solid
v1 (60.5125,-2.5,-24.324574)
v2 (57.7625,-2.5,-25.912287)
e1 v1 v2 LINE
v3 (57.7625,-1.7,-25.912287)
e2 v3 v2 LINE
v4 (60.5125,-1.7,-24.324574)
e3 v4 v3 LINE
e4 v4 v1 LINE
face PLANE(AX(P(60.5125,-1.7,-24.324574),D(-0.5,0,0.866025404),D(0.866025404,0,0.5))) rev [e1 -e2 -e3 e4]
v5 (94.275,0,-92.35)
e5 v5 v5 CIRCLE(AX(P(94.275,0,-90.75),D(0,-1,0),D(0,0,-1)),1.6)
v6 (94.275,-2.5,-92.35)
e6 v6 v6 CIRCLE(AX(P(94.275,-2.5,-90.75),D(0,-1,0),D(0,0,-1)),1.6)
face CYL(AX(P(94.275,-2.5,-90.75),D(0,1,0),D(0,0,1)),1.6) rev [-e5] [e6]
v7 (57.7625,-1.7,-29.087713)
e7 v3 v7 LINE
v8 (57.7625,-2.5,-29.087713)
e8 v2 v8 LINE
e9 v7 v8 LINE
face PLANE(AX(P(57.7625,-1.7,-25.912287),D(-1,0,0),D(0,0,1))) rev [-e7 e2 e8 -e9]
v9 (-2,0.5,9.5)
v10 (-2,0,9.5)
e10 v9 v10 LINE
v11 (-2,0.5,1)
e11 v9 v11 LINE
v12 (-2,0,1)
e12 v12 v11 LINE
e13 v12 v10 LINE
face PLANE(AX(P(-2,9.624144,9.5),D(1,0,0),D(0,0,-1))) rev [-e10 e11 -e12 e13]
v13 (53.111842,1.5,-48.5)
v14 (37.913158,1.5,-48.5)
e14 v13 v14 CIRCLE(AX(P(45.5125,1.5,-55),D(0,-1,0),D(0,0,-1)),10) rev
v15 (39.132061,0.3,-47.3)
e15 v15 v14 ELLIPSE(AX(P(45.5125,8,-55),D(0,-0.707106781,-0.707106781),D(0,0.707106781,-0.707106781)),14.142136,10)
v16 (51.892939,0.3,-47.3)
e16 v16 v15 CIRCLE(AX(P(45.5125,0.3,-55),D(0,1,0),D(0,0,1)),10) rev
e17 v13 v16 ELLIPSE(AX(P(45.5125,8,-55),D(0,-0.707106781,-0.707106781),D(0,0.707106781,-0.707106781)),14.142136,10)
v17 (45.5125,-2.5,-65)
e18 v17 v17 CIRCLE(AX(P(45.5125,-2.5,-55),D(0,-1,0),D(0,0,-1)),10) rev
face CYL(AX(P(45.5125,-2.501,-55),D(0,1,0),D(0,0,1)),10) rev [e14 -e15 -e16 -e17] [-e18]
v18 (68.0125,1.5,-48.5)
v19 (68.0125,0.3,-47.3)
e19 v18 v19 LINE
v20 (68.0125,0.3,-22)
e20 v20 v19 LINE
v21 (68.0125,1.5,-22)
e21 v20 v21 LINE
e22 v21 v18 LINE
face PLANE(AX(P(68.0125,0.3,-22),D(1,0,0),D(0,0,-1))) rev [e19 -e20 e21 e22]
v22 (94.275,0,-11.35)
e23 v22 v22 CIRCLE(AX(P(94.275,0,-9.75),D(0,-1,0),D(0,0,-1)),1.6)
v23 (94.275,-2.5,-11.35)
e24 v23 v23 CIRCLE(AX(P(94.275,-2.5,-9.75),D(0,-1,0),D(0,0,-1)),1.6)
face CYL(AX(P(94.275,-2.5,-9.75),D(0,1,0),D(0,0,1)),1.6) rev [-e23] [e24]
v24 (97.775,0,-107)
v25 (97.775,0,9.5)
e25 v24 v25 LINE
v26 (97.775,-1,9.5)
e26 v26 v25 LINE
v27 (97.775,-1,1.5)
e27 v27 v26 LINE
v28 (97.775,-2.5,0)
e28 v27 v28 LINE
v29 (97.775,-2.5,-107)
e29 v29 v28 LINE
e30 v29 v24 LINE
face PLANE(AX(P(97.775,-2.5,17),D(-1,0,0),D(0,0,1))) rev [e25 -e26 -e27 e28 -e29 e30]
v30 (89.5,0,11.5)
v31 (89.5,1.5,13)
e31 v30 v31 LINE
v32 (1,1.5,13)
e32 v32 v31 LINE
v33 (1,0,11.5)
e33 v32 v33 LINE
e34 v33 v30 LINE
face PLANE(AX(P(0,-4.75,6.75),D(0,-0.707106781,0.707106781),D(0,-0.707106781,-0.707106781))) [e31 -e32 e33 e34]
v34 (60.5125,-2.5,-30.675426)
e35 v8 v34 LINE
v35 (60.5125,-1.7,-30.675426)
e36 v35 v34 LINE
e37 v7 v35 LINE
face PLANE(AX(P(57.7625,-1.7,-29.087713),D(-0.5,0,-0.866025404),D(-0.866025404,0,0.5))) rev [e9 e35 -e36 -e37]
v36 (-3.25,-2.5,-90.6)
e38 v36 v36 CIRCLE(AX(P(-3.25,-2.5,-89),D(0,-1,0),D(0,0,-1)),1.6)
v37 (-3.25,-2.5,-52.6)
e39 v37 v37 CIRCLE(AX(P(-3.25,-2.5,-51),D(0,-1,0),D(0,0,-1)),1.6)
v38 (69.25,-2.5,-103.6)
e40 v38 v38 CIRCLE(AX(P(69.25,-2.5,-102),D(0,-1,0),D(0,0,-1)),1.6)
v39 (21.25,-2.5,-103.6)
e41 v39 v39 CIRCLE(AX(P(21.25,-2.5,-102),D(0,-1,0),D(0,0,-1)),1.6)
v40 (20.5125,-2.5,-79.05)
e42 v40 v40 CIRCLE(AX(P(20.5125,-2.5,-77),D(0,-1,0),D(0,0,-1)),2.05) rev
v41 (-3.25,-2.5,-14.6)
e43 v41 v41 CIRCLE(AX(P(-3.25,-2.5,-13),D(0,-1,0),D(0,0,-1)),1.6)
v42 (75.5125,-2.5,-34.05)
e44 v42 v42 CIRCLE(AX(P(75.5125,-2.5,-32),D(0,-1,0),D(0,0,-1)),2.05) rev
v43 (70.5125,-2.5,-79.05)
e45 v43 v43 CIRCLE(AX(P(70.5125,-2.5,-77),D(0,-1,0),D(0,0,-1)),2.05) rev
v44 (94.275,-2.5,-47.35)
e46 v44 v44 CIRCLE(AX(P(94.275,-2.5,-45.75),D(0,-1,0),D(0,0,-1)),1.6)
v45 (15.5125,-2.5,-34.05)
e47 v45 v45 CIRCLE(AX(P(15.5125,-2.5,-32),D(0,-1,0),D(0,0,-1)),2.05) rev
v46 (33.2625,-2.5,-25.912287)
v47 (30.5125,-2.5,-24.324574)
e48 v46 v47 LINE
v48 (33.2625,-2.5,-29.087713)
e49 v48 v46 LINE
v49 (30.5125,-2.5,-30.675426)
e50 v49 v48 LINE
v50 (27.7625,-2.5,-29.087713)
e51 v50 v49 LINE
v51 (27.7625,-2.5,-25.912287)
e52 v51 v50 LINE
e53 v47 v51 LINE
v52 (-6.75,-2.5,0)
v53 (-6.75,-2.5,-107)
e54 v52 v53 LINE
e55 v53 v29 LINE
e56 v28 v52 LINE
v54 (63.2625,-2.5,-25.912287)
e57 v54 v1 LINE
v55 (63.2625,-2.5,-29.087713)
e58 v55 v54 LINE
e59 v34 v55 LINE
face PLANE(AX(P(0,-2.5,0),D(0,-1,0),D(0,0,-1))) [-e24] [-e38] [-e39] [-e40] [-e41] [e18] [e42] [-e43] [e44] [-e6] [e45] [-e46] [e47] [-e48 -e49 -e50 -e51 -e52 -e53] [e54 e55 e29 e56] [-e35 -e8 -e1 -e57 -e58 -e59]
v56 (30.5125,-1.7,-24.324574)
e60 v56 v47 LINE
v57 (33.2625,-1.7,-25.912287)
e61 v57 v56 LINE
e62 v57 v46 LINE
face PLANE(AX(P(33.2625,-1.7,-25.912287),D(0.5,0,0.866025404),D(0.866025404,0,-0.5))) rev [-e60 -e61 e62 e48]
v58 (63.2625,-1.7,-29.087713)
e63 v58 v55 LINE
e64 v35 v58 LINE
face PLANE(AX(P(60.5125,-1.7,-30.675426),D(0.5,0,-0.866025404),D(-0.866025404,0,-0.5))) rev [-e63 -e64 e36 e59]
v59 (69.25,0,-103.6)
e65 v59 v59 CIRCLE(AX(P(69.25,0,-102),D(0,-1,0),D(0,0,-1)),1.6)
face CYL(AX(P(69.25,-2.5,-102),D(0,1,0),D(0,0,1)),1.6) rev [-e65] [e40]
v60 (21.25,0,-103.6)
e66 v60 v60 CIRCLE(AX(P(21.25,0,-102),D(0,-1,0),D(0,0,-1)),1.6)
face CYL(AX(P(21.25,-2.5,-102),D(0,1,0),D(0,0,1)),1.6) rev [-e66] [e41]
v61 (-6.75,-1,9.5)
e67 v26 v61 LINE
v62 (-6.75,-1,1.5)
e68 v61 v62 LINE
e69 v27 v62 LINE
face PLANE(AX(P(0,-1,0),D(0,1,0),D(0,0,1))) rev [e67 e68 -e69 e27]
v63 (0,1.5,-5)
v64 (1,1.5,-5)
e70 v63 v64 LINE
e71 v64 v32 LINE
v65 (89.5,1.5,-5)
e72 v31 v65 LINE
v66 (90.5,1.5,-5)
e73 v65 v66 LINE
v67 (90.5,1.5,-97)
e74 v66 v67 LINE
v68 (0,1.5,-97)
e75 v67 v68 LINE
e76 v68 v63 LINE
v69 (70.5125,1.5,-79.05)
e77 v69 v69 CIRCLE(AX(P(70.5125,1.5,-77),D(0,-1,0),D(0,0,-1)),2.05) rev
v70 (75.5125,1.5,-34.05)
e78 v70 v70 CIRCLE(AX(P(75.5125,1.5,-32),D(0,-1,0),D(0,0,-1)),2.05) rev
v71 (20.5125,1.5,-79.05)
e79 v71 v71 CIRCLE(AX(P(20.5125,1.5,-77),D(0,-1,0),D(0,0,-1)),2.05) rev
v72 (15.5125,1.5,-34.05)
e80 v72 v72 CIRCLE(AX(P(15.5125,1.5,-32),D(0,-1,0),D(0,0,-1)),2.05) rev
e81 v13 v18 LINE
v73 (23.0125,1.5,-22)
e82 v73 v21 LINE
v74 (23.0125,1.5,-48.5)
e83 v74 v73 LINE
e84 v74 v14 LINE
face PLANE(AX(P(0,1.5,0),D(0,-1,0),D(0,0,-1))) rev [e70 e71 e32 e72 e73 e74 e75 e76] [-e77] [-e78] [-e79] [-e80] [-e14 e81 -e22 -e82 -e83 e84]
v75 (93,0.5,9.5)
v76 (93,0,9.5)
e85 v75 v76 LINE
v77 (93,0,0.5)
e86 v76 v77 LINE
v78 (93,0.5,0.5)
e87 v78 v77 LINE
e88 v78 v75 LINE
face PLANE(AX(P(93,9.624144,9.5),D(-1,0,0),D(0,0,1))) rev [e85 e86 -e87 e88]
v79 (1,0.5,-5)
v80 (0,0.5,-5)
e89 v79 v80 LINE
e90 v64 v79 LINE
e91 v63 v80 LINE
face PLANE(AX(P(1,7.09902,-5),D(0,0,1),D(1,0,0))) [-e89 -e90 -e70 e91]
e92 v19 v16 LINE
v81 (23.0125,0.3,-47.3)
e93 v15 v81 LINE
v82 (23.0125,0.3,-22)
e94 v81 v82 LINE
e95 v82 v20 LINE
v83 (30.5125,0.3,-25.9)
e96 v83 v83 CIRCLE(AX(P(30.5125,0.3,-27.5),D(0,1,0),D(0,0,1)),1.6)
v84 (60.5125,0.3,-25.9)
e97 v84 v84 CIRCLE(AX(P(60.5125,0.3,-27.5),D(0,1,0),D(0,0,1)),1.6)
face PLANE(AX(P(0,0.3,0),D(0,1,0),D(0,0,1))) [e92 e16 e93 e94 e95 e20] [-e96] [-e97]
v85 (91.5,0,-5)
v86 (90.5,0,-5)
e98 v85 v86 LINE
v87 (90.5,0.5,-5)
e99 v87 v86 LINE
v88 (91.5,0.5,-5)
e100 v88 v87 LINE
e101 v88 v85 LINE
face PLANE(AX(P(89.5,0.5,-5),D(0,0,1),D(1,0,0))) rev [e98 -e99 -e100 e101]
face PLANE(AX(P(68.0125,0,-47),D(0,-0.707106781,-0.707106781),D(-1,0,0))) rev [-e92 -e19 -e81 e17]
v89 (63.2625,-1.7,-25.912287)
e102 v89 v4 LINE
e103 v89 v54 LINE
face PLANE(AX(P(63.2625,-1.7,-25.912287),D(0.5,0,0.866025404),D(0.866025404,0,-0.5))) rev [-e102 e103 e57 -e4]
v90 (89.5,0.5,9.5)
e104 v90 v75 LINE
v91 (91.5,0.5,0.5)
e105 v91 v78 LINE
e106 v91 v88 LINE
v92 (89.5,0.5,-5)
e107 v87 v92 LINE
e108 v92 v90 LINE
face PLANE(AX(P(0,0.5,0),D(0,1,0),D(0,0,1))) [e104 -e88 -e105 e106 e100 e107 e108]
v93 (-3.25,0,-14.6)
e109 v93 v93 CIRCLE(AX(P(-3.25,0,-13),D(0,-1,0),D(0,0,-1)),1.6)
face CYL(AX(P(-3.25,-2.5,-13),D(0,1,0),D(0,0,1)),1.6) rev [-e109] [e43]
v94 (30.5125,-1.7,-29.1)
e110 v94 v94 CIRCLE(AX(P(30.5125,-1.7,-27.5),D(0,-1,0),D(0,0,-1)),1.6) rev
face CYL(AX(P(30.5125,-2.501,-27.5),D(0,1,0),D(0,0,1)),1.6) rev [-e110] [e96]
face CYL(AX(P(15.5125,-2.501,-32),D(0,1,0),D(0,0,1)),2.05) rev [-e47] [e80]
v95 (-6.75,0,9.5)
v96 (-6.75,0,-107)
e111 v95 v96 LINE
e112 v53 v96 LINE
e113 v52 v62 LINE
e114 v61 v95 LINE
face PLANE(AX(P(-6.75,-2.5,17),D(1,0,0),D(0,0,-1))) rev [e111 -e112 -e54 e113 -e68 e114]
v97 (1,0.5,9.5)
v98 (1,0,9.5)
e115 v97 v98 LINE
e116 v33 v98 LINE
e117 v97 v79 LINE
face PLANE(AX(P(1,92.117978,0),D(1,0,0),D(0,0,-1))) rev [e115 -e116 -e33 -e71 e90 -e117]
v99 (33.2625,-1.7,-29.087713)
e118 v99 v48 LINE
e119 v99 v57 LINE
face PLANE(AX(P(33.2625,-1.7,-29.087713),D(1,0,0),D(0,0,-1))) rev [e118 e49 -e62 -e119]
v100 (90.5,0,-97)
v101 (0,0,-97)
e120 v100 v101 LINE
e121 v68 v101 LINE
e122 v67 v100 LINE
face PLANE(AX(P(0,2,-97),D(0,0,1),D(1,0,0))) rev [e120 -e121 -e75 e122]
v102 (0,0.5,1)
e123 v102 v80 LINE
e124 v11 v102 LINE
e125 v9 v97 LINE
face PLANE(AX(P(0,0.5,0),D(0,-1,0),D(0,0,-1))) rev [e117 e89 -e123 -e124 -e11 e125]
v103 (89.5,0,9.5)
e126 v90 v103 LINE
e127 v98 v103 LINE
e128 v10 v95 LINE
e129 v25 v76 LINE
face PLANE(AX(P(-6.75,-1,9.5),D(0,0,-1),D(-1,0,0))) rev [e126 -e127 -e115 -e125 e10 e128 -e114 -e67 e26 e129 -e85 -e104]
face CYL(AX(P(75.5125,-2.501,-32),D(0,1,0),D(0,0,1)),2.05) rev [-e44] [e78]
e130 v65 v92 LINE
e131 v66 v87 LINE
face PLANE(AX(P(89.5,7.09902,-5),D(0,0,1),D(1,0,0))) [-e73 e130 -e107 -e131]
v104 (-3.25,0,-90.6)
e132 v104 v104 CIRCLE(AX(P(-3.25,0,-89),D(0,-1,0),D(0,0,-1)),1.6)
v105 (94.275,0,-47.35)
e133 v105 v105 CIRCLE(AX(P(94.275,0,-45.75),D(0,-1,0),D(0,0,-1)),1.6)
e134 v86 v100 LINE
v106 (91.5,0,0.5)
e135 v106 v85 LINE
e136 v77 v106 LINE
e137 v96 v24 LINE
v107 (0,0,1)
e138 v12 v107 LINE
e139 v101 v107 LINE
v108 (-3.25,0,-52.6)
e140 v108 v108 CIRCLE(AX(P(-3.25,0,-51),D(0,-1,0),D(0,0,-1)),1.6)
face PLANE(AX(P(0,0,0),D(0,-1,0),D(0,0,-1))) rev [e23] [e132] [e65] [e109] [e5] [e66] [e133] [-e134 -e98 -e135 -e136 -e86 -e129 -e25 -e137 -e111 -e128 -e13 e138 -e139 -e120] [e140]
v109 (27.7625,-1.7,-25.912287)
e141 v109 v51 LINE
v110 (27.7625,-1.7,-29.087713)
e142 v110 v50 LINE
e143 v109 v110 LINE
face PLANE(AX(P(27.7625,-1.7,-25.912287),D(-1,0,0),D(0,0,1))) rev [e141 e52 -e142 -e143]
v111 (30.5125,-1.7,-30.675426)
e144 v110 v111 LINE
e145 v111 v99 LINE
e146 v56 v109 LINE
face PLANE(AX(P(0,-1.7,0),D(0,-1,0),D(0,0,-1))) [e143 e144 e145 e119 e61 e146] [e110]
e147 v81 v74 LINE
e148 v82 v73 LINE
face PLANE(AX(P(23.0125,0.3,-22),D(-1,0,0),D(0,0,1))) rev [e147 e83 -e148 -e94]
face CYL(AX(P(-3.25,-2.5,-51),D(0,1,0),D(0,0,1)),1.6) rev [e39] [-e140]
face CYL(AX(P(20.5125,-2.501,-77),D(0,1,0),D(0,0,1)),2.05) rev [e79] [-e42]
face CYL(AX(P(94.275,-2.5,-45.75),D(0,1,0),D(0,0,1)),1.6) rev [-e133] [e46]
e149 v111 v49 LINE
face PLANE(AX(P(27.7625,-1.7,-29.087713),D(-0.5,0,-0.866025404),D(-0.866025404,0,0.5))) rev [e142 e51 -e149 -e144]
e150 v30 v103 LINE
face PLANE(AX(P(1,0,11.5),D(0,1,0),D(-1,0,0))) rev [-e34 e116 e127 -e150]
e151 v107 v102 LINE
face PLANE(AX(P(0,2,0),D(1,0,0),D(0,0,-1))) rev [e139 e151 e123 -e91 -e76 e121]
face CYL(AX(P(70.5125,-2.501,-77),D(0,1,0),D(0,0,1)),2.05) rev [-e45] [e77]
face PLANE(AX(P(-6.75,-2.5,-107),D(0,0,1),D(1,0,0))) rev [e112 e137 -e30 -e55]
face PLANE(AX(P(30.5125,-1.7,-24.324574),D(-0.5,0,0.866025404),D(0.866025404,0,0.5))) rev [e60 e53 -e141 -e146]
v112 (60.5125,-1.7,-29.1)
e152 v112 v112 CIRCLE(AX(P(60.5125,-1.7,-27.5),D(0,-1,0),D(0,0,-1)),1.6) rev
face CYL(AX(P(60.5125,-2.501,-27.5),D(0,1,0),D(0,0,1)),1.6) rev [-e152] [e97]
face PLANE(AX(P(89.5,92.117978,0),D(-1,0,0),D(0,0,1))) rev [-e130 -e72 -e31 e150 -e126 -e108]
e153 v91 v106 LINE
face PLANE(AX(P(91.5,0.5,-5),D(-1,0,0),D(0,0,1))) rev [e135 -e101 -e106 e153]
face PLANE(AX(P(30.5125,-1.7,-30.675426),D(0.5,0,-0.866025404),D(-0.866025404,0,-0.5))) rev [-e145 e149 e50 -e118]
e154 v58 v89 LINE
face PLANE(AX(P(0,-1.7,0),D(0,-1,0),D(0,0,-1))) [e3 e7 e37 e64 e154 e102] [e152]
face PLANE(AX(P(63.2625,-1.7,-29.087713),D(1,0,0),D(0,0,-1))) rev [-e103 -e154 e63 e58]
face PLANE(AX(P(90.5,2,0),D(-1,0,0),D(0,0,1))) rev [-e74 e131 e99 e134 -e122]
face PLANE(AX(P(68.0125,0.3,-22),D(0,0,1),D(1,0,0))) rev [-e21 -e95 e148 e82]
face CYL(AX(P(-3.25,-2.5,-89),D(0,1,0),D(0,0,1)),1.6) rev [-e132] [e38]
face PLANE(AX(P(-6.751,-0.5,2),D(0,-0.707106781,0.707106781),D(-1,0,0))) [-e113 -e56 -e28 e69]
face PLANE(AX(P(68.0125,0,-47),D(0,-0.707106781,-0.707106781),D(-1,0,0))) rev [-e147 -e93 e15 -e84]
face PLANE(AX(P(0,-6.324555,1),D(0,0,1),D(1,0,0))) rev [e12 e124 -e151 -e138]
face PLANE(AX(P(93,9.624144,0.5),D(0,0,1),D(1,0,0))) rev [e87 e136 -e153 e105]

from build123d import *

# Parameters (mm, degrees)
SKETCH_1_W           = 90.5
SKETCH_1_H           = 97
EXTRUDE_1_DEPTH      = 2
SKETCH_2_W           = 104.525
SKETCH_2_H           = 124
SKETCH_2_R           = 1.6
EXTRUDE_2_DEPTH      = 2.5
SKETCH_3_W           = 88.5
SKETCH_3_H           = 17
EXTRUDE_3_DEPTH      = 2
SKETCH_4_W           = 1
SKETCH_4_H           = 5
CUT_EXTRUDE_1_DEPTH  = 2
CUT_EXTRUDE_2_DEPTH  = 150.601890446
SKETCH_6_W           = 45
SKETCH_6_H           = 25
CUT_EXTRUDE_3_DEPTH  = 1.7
CUT_EXTRUDE_4_REACH  = 146.972
SKETCH_7_R           = 1.6
CHAMFER_1_SIZE       = 2
CUT_EXTRUDE_5_REACH  = 147.014
SKETCH_8_R           = 2.05
CUT_EXTRUDE_6_REACH  = 147.014
SKETCH_9_R           = 10
CUT_EXTRUDE_7_DEPTH  = 0.8
CUT_EXTRUDE_8_REACH  = 151.602
SKETCH_11_W          = 6.5
SKETCH_11_H          = 2.5
CHAMFER_2_SIZE       = 2
SKETCH_12_W          = 104.525
SKETCH_12_H          = 9.5
EXTRUDE_4_DEPTH      = 1
SKETCH_13_W          = 2
SKETCH_13_H          = 14.5
EXTRUDE_5_DEPTH      = 0.5
SKETCH_14_W          = 1.5
SKETCH_14_H          = 9
SKETCH_14_W_2        = 1
EXTRUDE_6_DEPTH      = 0.5
SKETCH_15_W          = 88.5
SKETCH_15_H          = 2.828427125
EXTRUDE_7_DEPTH      = 2
CUT_EXTRUDE_9_DEPTH  = 0.5
SKETCH_17_W          = 2
SKETCH_17_H          = 6
CUT_EXTRUDE_10_DEPTH = 0.5


with BuildPart() as part:
    # 草图1 → 凸台-拉伸1 (new body)
    with BuildSketch(Plane(origin=(0, 0, 0), x_dir=(1, 0, 0), z_dir=(0, 1, 0))):
        with Locations((45.25, 48.5)):
            Rectangle(SKETCH_1_W, SKETCH_1_H)
    extrude(amount=EXTRUDE_1_DEPTH)

    # 草图2 → 凸台-拉伸2 (add)
    with BuildSketch(Plane.XZ):
        with Locations((45.5125, -45)):
            Rectangle(SKETCH_2_W, SKETCH_2_H)
        with Locations(Location((21.25, -102, 0), (0, 0, 270))):
            Circle(SKETCH_2_R, mode=Mode.SUBTRACT)
        with Locations(Location((69.25, -102, 0), (0, 0, 270))):
            Circle(SKETCH_2_R, mode=Mode.SUBTRACT)
        with Locations(Location((-3.25, -89, 0), (0, 0, 270))):
            Circle(SKETCH_2_R, mode=Mode.SUBTRACT)
        with Locations(Location((94.275, -90.75, 0), (0, 0, 270))):
            Circle(SKETCH_2_R, mode=Mode.SUBTRACT)
        with Locations(Location((-3.25, -13, 0), (0, 0, 270))):
            Circle(SKETCH_2_R, mode=Mode.SUBTRACT)
        with Locations(Location((-3.25, -51, 0), (0, 0, 270))):
            Circle(SKETCH_2_R, mode=Mode.SUBTRACT)
        with Locations(Location((94.275, -9.75, 0), (0, 0, 270))):
            Circle(SKETCH_2_R, mode=Mode.SUBTRACT)
        with Locations(Location((94.275, -45.75, 0), (0, 0, 270))):
            Circle(SKETCH_2_R, mode=Mode.SUBTRACT)
    extrude(amount=EXTRUDE_2_DEPTH)

    # 草图3 → 凸台-拉伸3 (add)
    with BuildSketch(Plane(origin=(0, 0, 0), x_dir=(1, 0, 0), z_dir=(0, 1, 0))):
        with Locations((45.25, -8.5)):
            Rectangle(SKETCH_3_W, SKETCH_3_H)
    extrude(amount=EXTRUDE_3_DEPTH)

    # 草图4 → 切除-拉伸1 (cut)
    with BuildSketch(Plane(origin=(0, 0, 0), x_dir=(1, 0, 0), z_dir=(0, 1, 0))):
        with Locations((0.5, 2.5)):
            Rectangle(SKETCH_4_W, SKETCH_4_H)
        with Locations((90, 2.5)):
            Rectangle(SKETCH_4_W, SKETCH_4_H)
    extrude(amount=CUT_EXTRUDE_1_DEPTH, mode=Mode.SUBTRACT)

    # 草图5 → 切除-拉伸2 (cut, through all)
    with BuildSketch(Plane(origin=(97.775, 0, 0), x_dir=(0, 0, -1), z_dir=(1, 0, 0))):
        Polygon((-8.5, -2.5), (-8.5, 0), (-9.5, 0), (-11.5, 2), (-17, 2), (-17, -2.5), align=None)
    extrude(amount=-CUT_EXTRUDE_2_DEPTH, mode=Mode.SUBTRACT)

    # 草图6 → 切除-拉伸3 (cut)
    with BuildSketch(Plane(origin=(0, 2, 0), x_dir=(1, 0, 0), z_dir=(0, 1, 0))):
        with Locations((45.5125, 34.5)):
            Rectangle(SKETCH_6_W, SKETCH_6_H)
    extrude(amount=-CUT_EXTRUDE_3_DEPTH, mode=Mode.SUBTRACT)

    # 草图7 → 切除-拉伸4 (cut, up to next)
    with BuildSketch(Plane(origin=(0, 0.3, 0), x_dir=(1, 0, 0), z_dir=(0, 1, 0)), mode=Mode.PRIVATE) as cut_extrude_4_sk1:
        with Locations(Location((30.5125, 27.5, 0), (0, 0, 270))):
            Circle(SKETCH_7_R)
    cut_extrude_4_tool1 = extrude(cut_extrude_4_sk1.sketch, amount=-CUT_EXTRUDE_4_REACH, mode=Mode.PRIVATE) & part.part
    # 草图7 → 切除-拉伸4 (cut, up to next)
    with BuildSketch(Plane(origin=(0, 0.3, 0), x_dir=(1, 0, 0), z_dir=(0, 1, 0)), mode=Mode.PRIVATE) as cut_extrude_4_sk2:
        with Locations(Location((60.5125, 27.5, 0), (0, 0, 270))):
            Circle(SKETCH_7_R)
    cut_extrude_4_tool2 = extrude(cut_extrude_4_sk2.sketch, amount=-CUT_EXTRUDE_4_REACH, mode=Mode.PRIVATE) & part.part
    add(cut_extrude_4_tool1.solids().sort_by_distance((30.5125, 0.3, -27.5))[0], mode=Mode.SUBTRACT)
    add(cut_extrude_4_tool2.solids().sort_by_distance((60.5125, 0.3, -27.5))[0], mode=Mode.SUBTRACT)

    # 倒角1
    # the kernel refuses this chamfer: 2 mm, written as the material it adds along each edge
    # the kernel refuses this chamfer: 2 mm, written as the material it takes off along each edge
    with BuildSketch(Plane(origin=(23.0125, 2, -47), x_dir=(0, 0.027495876610586296, -0.9996219169112968), z_dir=(1, 0, 0))) as chamfer_1_2_piece_1_section:
        Polygon((CHAMFER_1_SIZE * 0.999621916911, -CHAMFER_1_SIZE * 0.0274958766106), (-CHAMFER_1_SIZE * 0.0274958766106, -CHAMFER_1_SIZE * 0.999621916911), (0, 0), align=None)
    chamfer_1_2_piece_1 = extrude(amount=45, mode=Mode.PRIVATE)
    chamfer_1_2_piece_1 = split(chamfer_1_2_piece_1, bisect_by=Plane(origin=(45.5125, 0.3, -47.679710145), z_dir=(0, 1, 0)), keep=Keep.TOP, mode=Mode.PRIVATE)
    add(chamfer_1_2_piece_1, mode=Mode.SUBTRACT)

    # 草图8 → 切除-拉伸5 (cut, up to next)
    with BuildSketch(Plane(origin=(0, 2, 0), x_dir=(1, 0, 0), z_dir=(0, 1, 0)), mode=Mode.PRIVATE) as cut_extrude_5_sk1:
        with Locations(Location((20.5125, 77, 0), (0, 0, 270))):
            Circle(SKETCH_8_R)
    cut_extrude_5_tool1 = extrude(cut_extrude_5_sk1.sketch, amount=-CUT_EXTRUDE_5_REACH, mode=Mode.PRIVATE) & part.part
    # 草图8 → 切除-拉伸5 (cut, up to next)
    with BuildSketch(Plane(origin=(0, 2, 0), x_dir=(1, 0, 0), z_dir=(0, 1, 0)), mode=Mode.PRIVATE) as cut_extrude_5_sk2:
        with Locations(Location((70.5125, 77, 0), (0, 0, 270))):
            Circle(SKETCH_8_R)
    cut_extrude_5_tool2 = extrude(cut_extrude_5_sk2.sketch, amount=-CUT_EXTRUDE_5_REACH, mode=Mode.PRIVATE) & part.part
    # 草图8 → 切除-拉伸5 (cut, up to next)
    with BuildSketch(Plane(origin=(0, 2, 0), x_dir=(1, 0, 0), z_dir=(0, 1, 0)), mode=Mode.PRIVATE) as cut_extrude_5_sk3:
        with Locations(Location((15.5125, 32, 0), (0, 0, 270))):
            Circle(SKETCH_8_R)
    cut_extrude_5_tool3 = extrude(cut_extrude_5_sk3.sketch, amount=-CUT_EXTRUDE_5_REACH, mode=Mode.PRIVATE) & part.part
    # 草图8 → 切除-拉伸5 (cut, up to next)
    with BuildSketch(Plane(origin=(0, 2, 0), x_dir=(1, 0, 0), z_dir=(0, 1, 0)), mode=Mode.PRIVATE) as cut_extrude_5_sk4:
        with Locations(Location((75.5125, 32, 0), (0, 0, 270))):
            Circle(SKETCH_8_R)
    cut_extrude_5_tool4 = extrude(cut_extrude_5_sk4.sketch, amount=-CUT_EXTRUDE_5_REACH, mode=Mode.PRIVATE) & part.part
    add(cut_extrude_5_tool1.solids().sort_by_distance((20.5125, 2, -77))[0], mode=Mode.SUBTRACT)
    add(cut_extrude_5_tool2.solids().sort_by_distance((70.5125, 2, -77))[0], mode=Mode.SUBTRACT)
    add(cut_extrude_5_tool3.solids().sort_by_distance((15.5125, 2, -32))[0], mode=Mode.SUBTRACT)
    add(cut_extrude_5_tool4.solids().sort_by_distance((75.5125, 2, -32))[0], mode=Mode.SUBTRACT)

    # 草图9 → 切除-拉伸6 (cut, up to next)
    with BuildSketch(Plane(origin=(0, 2, 0), x_dir=(1, 0, 0), z_dir=(0, 1, 0)), mode=Mode.PRIVATE) as cut_extrude_6_sk1:
        with Locations(Location((45.5125, 55, 0), (0, 0, 230.353888853))):
            Circle(SKETCH_9_R)
    cut_extrude_6_tool1 = extrude(cut_extrude_6_sk1.sketch, amount=-CUT_EXTRUDE_6_REACH, mode=Mode.PRIVATE) & part.part
    add(cut_extrude_6_tool1.solids().sort_by_distance((45.5125, 2, -55))[0], mode=Mode.SUBTRACT)

    # 草图10 → 切除-拉伸7 (cut)
    with BuildSketch(Plane.XZ.offset(2.5)):
        Polygon((27.7625, -25.91228676), (27.7625, -29.08771324), (30.5125, -30.675426481), (33.2625, -29.08771324), (33.2625, -25.91228676), (30.5125, -24.324573519), align=None)
        Polygon((57.7625, -25.91228676), (57.7625, -29.08771324), (60.5125, -30.675426481), (63.2625, -29.08771324), (63.2625, -25.91228676), (60.5125, -24.324573519), align=None)
    extrude(amount=-CUT_EXTRUDE_7_DEPTH, mode=Mode.SUBTRACT)

    # 草图11 → 切除-拉伸8 (cut, up to next)
    with BuildSketch(Plane(origin=(97.775, 0, 0), x_dir=(0, 0, -1), z_dir=(1, 0, 0)), mode=Mode.PRIVATE) as cut_extrude_8_sk1:
        with Locations((-5.25, -1.25)):
            Rectangle(SKETCH_11_W, SKETCH_11_H)
    cut_extrude_8_tool1 = extrude(cut_extrude_8_sk1.sketch, amount=-CUT_EXTRUDE_8_REACH, mode=Mode.PRIVATE) & part.part
    add(cut_extrude_8_tool1.solids().sort_by_distance((97.775, -1.25, 5.25))[0], mode=Mode.SUBTRACT)

    # 倒角2
    chamfer_2_edges = [part.edges().sort_by_distance(p)[0] for p in [
        (45.5125, -2.5, 2),
    ]]
    chamfer(chamfer_2_edges, length=CHAMFER_2_SIZE)

    # 草图12 → 凸台-拉伸4 (add)
    with BuildSketch(Plane.XZ):
        with Locations((45.5125, 4.75)):
            Rectangle(SKETCH_12_W, SKETCH_12_H)
    extrude(amount=EXTRUDE_4_DEPTH)

    # 草图13 → 凸台-拉伸5 (add)
    with BuildSketch(Plane(origin=(0, 0, 0), x_dir=(1, 0, 0), z_dir=(0, 1, 0))):
        with Locations((0, -2.25)):
            Rectangle(SKETCH_13_W, SKETCH_13_H)
        with Locations((90.5, -2.25)):
            Rectangle(SKETCH_13_W, SKETCH_13_H)
    extrude(amount=EXTRUDE_5_DEPTH)

    # 草图14 → 凸台-拉伸6 (add)
    with BuildSketch(Plane(origin=(0, 0, 0), x_dir=(1, 0, 0), z_dir=(0, 1, 0))):
        with Locations((92.25, -5)):
            Rectangle(SKETCH_14_W, SKETCH_14_H)
        with Locations((-1.5, -5)):
            Rectangle(SKETCH_14_W_2, SKETCH_14_H)
    extrude(amount=EXTRUDE_6_DEPTH)

    # 草图15 → 凸台-拉伸7 (add, along a direction that is not the sketch's normal)
    with BuildSketch(Plane(origin=(0, -4.75, 4.75), x_dir=(1, 0, 0), z_dir=(0, -0.7071067811865501, 0.7071067811865449))):
        with Locations((45.25, 8.131727983)):
            Rectangle(SKETCH_15_W, SKETCH_15_H)
    extrude(amount=EXTRUDE_7_DEPTH, dir=(0, 0, 1))

    # 草图16 → 切除-拉伸9 (cut)
    with BuildSketch(Plane(origin=(0, 2, 0), x_dir=(1, 0, 0), z_dir=(0, 1, 0))):
        Polygon((1, 5), (1, -13.5), (89.5, -13.5), (89.5, 5), (90.5, 5), (90.5, 97), (0, 97), (0, 5), align=None)
    extrude(amount=-CUT_EXTRUDE_9_DEPTH, mode=Mode.SUBTRACT)

    # 草图17 → 切除-拉伸10 (cut)
    with BuildSketch(Plane(origin=(0, 0.5, 0), x_dir=(1, 0, 0), z_dir=(0, 1, 0))):
        with Locations((-1, 2)):
            Rectangle(SKETCH_17_W, SKETCH_17_H)
    extrude(amount=-CUT_EXTRUDE_10_DEPTH, mode=Mode.SUBTRACT)


solid = part.part
